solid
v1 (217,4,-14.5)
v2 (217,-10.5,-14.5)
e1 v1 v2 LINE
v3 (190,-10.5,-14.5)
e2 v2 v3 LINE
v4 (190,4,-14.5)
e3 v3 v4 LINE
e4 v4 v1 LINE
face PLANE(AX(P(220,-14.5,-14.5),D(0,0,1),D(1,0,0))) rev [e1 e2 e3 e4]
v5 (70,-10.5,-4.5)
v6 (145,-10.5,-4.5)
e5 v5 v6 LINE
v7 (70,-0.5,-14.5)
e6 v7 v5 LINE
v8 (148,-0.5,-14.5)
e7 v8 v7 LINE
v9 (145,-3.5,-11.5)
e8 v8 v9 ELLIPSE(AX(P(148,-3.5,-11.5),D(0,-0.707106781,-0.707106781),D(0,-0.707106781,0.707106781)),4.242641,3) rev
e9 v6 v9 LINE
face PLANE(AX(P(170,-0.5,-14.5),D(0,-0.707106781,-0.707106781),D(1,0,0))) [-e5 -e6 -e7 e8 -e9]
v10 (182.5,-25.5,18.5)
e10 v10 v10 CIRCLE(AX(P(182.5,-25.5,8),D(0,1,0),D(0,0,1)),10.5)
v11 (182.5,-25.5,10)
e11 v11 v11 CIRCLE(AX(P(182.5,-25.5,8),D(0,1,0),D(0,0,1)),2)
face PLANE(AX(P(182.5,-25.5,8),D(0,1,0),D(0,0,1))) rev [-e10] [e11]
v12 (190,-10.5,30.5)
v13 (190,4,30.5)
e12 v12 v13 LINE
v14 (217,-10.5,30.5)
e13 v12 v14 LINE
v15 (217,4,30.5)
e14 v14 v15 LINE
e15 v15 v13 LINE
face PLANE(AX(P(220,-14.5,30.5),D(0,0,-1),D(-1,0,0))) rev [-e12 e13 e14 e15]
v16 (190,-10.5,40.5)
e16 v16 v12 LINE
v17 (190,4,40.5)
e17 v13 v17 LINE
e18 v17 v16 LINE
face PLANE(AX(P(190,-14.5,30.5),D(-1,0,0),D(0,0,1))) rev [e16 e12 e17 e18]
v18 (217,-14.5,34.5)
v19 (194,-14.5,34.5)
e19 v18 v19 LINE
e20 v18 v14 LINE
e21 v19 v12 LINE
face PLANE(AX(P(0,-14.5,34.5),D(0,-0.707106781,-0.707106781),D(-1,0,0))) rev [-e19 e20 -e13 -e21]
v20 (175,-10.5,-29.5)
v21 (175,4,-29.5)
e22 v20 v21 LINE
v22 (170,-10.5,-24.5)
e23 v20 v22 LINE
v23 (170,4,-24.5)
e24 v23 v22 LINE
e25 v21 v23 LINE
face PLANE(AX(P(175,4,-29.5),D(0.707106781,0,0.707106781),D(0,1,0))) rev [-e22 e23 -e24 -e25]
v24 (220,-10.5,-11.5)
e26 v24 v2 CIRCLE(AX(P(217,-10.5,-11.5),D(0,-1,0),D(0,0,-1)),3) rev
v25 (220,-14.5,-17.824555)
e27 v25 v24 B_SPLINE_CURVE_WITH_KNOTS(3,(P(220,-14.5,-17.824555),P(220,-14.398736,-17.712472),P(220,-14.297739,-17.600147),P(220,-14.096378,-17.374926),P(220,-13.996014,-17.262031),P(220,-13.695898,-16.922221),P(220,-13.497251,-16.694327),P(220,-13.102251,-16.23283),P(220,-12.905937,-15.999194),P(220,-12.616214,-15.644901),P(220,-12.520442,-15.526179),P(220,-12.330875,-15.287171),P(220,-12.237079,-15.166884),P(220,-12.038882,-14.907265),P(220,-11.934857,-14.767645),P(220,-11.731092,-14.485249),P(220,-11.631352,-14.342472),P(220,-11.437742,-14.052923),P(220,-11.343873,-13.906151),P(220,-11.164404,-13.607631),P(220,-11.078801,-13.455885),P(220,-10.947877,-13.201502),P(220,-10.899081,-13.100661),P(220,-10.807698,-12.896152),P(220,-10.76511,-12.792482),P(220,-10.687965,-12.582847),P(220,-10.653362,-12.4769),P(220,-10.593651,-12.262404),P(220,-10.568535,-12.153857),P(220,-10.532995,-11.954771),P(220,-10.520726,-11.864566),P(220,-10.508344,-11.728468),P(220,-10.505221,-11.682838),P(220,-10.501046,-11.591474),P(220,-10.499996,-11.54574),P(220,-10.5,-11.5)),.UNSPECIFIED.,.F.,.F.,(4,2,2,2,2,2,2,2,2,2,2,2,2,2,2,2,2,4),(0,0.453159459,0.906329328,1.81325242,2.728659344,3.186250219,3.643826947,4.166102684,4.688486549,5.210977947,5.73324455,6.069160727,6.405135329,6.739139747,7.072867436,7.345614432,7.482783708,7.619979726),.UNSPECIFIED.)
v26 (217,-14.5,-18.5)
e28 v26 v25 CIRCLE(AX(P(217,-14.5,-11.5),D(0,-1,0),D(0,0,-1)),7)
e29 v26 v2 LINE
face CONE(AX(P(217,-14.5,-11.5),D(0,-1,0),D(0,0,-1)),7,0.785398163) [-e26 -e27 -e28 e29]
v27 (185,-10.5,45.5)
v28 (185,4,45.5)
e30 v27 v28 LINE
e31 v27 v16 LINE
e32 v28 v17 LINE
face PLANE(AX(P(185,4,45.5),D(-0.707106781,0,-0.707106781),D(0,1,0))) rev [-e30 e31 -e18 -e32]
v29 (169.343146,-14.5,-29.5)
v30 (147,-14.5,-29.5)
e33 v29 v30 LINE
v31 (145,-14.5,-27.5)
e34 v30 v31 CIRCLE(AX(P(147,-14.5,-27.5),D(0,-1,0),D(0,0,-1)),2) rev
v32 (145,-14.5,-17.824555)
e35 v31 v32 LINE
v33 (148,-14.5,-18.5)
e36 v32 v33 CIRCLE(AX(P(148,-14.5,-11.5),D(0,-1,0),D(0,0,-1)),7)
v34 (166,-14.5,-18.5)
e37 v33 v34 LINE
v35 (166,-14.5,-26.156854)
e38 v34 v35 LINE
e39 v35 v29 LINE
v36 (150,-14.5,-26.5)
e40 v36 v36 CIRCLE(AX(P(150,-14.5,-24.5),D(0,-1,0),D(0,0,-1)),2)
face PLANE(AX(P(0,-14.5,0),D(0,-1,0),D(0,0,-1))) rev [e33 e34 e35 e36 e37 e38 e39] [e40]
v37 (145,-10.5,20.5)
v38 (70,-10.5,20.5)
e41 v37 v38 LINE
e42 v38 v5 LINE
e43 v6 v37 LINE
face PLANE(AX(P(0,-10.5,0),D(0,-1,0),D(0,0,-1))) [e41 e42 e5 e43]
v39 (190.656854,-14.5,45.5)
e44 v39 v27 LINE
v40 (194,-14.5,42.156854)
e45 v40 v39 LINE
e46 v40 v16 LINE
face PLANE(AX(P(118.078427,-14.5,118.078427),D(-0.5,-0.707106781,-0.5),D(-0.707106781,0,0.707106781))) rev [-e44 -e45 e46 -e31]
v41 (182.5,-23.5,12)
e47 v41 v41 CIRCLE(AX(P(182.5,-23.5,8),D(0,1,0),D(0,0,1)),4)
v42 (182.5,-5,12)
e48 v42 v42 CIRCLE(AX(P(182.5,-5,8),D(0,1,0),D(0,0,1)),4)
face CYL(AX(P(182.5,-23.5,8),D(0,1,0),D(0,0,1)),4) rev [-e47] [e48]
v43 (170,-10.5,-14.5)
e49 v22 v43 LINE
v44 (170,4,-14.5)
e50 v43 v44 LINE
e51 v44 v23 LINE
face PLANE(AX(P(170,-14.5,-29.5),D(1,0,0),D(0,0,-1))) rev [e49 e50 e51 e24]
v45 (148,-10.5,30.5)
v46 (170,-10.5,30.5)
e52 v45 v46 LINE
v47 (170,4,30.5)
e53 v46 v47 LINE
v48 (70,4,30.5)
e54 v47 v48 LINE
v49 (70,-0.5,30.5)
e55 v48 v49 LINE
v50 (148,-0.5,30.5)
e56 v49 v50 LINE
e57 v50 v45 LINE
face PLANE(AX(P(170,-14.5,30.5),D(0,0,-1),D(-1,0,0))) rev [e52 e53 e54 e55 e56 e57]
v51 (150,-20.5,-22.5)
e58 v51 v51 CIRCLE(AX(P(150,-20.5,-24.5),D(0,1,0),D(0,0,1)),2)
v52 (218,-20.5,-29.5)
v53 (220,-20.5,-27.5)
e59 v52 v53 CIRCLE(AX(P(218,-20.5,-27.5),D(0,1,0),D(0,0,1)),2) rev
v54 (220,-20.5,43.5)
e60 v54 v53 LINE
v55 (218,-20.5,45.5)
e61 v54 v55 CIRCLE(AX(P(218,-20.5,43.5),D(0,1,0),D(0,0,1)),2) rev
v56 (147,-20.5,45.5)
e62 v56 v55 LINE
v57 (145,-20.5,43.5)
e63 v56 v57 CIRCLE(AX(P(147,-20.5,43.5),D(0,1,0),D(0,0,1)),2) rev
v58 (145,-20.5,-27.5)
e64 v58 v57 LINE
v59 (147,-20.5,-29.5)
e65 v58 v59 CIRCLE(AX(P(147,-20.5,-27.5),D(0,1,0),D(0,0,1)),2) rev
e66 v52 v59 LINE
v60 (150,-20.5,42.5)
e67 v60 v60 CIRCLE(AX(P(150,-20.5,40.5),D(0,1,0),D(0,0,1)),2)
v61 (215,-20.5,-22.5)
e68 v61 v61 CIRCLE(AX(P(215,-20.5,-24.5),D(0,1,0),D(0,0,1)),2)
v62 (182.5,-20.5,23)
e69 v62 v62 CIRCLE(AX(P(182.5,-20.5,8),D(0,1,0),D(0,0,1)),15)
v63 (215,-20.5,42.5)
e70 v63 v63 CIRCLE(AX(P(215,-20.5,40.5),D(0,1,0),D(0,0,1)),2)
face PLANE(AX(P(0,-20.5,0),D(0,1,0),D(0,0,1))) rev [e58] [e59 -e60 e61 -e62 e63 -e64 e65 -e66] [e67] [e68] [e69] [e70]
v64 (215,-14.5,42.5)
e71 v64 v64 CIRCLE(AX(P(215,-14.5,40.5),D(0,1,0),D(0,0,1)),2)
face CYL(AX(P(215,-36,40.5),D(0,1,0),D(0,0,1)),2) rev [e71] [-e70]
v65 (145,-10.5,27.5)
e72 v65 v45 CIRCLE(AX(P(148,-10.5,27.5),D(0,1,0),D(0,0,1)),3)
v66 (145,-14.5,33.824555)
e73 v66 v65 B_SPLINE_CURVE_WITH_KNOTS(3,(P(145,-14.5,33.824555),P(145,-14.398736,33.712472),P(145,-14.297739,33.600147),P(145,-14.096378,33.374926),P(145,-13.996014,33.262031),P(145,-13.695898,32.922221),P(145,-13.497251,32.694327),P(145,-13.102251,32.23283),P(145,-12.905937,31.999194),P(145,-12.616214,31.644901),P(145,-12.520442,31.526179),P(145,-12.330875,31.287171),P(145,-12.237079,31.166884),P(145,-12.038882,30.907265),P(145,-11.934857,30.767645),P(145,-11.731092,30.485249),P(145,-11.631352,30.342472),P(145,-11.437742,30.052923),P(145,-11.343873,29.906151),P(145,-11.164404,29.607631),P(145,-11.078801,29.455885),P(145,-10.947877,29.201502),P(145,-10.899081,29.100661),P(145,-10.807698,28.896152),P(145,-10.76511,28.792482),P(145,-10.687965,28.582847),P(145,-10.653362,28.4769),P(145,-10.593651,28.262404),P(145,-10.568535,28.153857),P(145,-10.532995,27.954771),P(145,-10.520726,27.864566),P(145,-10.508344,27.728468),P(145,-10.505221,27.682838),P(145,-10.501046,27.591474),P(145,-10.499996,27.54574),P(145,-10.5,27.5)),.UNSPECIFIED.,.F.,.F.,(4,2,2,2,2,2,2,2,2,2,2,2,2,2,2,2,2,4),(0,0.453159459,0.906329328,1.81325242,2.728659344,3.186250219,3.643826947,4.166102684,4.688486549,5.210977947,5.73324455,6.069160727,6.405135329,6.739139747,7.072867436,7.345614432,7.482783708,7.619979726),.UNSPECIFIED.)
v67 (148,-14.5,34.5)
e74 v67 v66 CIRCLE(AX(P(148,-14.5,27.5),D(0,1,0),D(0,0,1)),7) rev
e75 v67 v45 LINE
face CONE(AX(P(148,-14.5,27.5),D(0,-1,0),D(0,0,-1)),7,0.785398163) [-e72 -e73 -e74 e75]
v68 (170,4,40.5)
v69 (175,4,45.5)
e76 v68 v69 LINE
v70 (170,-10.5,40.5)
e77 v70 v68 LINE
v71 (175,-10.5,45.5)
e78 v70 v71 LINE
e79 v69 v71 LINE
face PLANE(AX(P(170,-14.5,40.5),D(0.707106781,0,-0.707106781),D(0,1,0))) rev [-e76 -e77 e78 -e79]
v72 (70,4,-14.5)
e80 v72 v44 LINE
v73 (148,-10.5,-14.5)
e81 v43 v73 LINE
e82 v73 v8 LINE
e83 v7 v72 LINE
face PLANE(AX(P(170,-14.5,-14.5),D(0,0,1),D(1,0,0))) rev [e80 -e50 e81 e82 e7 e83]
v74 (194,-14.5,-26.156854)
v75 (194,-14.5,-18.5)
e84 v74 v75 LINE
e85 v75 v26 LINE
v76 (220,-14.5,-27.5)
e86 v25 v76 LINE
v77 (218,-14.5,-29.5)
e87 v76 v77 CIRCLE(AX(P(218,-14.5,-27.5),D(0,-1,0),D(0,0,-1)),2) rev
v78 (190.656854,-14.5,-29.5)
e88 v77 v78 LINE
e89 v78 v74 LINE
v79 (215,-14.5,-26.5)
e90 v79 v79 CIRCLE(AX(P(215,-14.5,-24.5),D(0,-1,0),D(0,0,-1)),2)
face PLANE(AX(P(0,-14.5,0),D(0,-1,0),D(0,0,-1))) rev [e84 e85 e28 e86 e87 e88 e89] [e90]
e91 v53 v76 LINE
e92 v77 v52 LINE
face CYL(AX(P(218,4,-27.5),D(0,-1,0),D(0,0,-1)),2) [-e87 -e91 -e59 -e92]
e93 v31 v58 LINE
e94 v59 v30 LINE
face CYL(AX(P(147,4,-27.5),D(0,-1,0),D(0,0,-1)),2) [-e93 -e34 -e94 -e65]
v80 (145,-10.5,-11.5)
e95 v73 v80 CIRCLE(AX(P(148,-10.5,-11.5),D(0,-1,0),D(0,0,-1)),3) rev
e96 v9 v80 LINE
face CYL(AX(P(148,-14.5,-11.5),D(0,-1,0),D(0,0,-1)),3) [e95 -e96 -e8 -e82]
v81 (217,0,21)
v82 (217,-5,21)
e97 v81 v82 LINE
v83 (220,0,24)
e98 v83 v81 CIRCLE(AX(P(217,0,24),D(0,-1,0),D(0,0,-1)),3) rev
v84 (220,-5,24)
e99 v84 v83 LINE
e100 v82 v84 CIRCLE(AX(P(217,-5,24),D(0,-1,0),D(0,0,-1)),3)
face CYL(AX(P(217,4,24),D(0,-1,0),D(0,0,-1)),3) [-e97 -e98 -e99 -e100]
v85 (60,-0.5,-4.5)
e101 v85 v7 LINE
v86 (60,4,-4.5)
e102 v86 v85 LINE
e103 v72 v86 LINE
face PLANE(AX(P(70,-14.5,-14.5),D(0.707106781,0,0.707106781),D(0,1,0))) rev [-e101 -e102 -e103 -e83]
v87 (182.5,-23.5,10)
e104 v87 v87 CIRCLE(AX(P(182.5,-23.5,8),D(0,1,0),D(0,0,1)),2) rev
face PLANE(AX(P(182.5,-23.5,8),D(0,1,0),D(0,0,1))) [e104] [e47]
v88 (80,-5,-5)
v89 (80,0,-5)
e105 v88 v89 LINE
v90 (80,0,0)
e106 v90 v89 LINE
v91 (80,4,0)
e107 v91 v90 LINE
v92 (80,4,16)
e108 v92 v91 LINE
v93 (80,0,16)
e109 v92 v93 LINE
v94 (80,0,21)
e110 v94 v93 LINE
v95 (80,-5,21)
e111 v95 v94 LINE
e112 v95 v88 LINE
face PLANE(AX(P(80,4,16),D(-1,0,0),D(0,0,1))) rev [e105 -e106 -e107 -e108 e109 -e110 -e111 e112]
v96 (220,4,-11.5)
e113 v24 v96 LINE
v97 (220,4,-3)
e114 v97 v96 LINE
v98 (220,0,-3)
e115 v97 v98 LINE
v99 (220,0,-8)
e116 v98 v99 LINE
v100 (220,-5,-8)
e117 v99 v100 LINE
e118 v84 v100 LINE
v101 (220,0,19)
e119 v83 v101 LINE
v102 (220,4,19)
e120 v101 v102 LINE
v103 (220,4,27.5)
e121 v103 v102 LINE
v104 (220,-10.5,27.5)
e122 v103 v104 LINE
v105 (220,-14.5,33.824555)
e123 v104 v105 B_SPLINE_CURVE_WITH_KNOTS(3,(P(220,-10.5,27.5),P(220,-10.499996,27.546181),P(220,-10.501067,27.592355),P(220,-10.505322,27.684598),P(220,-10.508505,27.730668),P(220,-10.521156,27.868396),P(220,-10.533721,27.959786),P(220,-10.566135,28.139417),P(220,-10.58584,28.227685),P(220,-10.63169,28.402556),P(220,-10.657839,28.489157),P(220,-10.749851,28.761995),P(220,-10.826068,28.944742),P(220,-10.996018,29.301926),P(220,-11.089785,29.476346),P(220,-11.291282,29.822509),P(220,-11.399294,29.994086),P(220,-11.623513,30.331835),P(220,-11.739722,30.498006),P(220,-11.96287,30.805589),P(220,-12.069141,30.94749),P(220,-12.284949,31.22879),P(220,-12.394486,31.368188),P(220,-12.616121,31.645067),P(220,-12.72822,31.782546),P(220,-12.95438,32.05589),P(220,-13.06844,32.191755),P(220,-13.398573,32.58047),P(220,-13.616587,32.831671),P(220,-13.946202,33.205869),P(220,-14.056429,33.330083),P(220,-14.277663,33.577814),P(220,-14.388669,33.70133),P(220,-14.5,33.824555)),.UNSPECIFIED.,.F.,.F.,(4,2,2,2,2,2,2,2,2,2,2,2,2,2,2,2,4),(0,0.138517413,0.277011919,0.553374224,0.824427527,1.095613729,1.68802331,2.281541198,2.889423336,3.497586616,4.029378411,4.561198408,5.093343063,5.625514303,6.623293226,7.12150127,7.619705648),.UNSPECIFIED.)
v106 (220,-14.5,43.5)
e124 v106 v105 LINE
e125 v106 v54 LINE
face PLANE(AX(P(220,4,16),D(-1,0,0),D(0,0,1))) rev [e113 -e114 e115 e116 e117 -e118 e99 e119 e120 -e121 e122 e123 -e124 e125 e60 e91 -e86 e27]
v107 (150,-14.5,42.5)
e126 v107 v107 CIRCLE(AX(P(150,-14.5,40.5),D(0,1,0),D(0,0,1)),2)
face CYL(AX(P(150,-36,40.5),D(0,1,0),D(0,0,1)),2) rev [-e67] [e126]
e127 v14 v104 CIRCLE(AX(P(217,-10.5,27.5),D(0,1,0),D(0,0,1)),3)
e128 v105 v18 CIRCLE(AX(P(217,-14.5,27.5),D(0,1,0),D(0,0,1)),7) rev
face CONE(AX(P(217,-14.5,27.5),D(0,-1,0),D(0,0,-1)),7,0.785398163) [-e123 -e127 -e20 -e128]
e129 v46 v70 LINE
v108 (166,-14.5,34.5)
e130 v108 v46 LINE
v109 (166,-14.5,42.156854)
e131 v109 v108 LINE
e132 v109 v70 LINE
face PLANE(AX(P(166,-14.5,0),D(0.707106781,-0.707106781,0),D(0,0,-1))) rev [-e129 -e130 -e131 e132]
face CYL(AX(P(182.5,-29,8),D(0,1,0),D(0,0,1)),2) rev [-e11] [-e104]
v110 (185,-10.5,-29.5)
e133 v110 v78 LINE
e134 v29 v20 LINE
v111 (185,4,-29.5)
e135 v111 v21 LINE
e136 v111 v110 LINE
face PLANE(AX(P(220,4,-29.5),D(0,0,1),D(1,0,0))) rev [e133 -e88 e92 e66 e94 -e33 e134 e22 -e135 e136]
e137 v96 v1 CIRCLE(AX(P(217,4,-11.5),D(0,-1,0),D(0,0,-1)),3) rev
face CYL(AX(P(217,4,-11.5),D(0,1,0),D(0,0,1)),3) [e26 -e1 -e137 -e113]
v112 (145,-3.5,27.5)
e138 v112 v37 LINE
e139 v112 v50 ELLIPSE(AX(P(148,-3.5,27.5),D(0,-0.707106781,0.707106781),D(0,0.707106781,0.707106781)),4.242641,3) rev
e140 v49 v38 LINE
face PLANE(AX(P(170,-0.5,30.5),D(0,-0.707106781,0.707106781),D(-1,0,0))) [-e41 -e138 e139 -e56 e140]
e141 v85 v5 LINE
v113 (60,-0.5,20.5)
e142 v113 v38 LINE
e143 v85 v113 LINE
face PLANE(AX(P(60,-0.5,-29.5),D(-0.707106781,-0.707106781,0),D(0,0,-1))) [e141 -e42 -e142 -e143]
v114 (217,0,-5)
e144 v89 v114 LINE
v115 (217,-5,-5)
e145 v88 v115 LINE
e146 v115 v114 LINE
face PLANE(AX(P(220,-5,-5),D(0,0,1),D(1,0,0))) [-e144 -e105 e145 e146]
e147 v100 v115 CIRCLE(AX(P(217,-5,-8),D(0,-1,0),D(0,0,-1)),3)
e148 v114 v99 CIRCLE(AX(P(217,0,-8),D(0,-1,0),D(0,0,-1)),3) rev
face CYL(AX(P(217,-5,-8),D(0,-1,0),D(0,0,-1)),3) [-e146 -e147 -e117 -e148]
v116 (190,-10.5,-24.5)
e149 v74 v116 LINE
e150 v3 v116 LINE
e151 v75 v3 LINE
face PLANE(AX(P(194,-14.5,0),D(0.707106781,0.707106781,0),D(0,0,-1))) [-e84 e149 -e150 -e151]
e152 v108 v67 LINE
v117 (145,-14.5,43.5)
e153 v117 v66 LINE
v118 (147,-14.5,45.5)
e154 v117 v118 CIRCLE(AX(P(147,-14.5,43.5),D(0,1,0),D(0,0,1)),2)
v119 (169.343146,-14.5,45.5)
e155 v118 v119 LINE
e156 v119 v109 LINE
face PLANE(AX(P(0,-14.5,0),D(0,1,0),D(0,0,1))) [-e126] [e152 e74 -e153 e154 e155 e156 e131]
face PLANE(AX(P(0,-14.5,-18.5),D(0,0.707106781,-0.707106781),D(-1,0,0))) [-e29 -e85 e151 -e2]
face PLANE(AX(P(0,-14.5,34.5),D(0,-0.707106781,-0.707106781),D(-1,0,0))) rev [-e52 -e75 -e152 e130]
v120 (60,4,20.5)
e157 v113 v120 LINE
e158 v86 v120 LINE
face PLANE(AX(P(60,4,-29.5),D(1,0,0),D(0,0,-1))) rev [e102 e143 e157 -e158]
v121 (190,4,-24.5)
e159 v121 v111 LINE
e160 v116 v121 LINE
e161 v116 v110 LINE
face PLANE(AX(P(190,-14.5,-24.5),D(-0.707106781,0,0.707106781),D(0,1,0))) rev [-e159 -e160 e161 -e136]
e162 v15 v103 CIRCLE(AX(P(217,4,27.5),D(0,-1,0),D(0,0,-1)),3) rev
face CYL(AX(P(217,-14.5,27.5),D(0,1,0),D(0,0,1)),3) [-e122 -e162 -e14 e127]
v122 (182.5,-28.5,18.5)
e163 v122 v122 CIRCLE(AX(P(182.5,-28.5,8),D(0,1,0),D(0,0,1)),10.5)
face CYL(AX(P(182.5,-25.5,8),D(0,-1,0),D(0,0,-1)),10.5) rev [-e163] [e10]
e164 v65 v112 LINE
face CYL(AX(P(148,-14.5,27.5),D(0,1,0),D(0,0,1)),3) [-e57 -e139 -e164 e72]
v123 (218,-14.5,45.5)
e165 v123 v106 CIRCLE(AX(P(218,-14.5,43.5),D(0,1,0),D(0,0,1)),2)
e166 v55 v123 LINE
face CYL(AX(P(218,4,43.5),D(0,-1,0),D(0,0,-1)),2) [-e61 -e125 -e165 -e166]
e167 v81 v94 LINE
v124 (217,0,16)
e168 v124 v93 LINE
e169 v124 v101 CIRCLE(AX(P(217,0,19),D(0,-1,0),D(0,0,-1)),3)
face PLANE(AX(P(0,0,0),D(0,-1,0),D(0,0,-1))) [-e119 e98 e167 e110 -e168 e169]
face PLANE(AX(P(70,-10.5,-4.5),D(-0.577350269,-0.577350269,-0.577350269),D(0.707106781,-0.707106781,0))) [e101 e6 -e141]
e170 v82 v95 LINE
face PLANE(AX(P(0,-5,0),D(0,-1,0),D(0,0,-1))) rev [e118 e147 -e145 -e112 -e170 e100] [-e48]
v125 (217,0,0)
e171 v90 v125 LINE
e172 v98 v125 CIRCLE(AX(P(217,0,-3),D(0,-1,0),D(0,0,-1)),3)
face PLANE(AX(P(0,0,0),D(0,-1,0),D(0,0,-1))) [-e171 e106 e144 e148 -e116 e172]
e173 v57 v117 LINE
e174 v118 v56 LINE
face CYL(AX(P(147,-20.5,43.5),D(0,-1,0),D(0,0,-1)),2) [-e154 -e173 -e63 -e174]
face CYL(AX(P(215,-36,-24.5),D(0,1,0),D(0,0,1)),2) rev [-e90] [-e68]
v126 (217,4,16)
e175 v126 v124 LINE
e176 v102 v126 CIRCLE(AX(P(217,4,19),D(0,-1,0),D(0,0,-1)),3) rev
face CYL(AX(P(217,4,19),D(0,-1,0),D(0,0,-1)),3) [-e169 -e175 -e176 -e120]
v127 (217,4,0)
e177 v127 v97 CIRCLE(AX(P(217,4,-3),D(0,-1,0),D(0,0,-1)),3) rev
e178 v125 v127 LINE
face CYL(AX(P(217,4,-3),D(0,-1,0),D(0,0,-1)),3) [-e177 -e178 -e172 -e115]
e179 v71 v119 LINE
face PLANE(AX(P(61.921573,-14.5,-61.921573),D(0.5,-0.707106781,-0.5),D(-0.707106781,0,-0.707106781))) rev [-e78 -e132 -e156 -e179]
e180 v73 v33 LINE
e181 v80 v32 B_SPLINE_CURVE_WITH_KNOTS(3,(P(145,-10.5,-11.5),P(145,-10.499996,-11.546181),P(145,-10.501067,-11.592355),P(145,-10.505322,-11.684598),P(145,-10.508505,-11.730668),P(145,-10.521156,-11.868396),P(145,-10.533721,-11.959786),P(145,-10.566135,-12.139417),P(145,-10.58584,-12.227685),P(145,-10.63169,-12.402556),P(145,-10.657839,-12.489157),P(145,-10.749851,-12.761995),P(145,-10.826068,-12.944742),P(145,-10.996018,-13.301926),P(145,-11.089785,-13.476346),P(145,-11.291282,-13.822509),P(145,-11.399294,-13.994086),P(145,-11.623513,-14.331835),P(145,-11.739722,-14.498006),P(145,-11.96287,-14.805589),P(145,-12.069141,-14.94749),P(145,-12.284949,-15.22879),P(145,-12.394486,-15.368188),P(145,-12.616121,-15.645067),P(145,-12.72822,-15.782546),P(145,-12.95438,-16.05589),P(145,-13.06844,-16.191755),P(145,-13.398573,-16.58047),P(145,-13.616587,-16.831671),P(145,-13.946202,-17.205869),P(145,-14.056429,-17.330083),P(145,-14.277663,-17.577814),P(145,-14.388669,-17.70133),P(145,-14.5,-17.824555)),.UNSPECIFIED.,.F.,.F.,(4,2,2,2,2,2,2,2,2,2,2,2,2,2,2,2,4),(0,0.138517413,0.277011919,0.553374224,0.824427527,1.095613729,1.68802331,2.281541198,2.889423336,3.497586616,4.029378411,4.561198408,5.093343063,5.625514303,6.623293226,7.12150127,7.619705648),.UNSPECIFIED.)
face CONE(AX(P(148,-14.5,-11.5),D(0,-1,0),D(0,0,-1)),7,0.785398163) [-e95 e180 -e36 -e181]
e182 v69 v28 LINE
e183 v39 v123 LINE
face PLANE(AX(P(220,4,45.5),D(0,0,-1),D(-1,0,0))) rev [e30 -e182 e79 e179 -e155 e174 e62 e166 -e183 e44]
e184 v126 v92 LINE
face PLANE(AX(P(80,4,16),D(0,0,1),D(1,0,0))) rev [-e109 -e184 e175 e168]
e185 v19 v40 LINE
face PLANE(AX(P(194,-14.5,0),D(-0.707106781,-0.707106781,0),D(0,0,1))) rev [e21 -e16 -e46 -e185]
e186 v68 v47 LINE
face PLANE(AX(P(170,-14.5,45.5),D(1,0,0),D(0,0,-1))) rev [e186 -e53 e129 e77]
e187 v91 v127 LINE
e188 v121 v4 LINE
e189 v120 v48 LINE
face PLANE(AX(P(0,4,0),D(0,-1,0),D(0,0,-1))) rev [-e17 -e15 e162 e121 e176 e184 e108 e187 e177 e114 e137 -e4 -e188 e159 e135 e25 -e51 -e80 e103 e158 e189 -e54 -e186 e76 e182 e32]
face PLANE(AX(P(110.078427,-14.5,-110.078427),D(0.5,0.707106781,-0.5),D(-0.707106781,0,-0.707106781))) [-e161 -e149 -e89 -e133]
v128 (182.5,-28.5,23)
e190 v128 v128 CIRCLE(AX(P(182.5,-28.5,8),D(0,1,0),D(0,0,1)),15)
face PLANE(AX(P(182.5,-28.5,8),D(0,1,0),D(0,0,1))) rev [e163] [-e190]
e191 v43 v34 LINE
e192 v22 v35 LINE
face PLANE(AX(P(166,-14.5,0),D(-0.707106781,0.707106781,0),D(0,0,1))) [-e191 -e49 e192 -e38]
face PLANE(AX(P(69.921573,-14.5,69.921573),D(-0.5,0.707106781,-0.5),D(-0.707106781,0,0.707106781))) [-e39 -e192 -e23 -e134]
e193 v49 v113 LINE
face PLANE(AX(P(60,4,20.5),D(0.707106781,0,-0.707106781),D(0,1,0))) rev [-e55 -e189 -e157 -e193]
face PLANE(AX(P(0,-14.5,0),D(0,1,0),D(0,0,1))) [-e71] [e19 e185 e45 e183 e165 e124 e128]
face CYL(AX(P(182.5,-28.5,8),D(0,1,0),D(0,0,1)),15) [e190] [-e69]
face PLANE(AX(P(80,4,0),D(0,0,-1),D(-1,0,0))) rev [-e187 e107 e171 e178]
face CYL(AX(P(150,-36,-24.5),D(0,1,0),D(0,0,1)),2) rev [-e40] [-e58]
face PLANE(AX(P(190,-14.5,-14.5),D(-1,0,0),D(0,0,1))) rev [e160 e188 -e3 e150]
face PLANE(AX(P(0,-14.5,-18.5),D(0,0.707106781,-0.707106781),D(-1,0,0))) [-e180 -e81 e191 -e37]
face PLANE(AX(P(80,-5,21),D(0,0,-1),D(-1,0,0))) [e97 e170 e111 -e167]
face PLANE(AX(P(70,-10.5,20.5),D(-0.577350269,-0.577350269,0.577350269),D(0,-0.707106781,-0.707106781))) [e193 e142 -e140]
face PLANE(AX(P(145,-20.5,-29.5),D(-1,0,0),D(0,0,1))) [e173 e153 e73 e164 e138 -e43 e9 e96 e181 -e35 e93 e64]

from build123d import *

# Parameters (mm, degrees)
BOSS_EXTRUDE1_DEPTH = 4
BOSS_EXTRUDE2_DEPTH = 5
BOSS_EXTRUDE3_START = -5
SKETCH3_W           = 160
SKETCH3_H           = 75
BOSS_EXTRUDE3_DEPTH = 5.5
BOSS_EXTRUDE4_START = -10.5
BOSS_EXTRUDE4_DEPTH = 10
BOSS_EXTRUDE7_START = -20.5
SKETCH17_R          = 15
BOSS_EXTRUDE7_DEPTH = 8
CUT_EXTRUDE1_START  = -28.5
SKETCH5_R           = 10.5
CUT_EXTRUDE1_DEPTH  = 3
CUT_EXTRUDE2_START  = -4
SKETCH7_R           = 2
CUT_EXTRUDE2_DEPTH  = 25
CUT_EXTRUDE3_START  = -5
SKETCH8_R           = 4
CUT_EXTRUDE3_DEPTH  = 18.5
CUT_EXTRUDE5_START  = 4
SKETCH18_W          = 110
SKETCH18_H          = 15
SKETCH18_W_2        = 30
CUT_EXTRUDE5_DEPTH  = 18.5
CUT_EXTRUDE6_START  = -4
SKETCH9_R           = 2
CUT_EXTRUDE6_DEPTH  = 40
CHAMFER1_SIZE       = 10
FILLET1_R           = 2
CHAMFER2_SIZE       = 5
FILLET6_R           = 3
CHAMFER4_SIZE       = 4


with BuildPart() as part:
    # Sketch1 → Boss-Extrude1 (new body)
    with BuildSketch(Plane(origin=(0, 0, 0), x_dir=(1, 0, 0), z_dir=(0, 1, 0))):
        Polygon((80, -16), (220, -16), (220, -45.5), (60, -45.5), (60, 29.5), (220, 29.5), (220, 0), (80, 0), align=None)
    extrude(amount=BOSS_EXTRUDE1_DEPTH)

    # Sketch2 → Boss-Extrude2 (add)
    with BuildSketch(Plane(origin=(0, 0, 0), x_dir=(1, 0, 0), z_dir=(0, 1, 0))):
        Polygon((220, 5), (220, 29.5), (60, 29.5), (60, -45.5), (220, -45.5), (220, -21), (80, -21), (80, 5), align=None)
    extrude(amount=-BOSS_EXTRUDE2_DEPTH)

    # Sketch3 → Boss-Extrude3 (add)
    with BuildSketch(Plane(origin=(0, 0, 0), x_dir=(1, 0, 0), z_dir=(0, 1, 0)).offset(BOSS_EXTRUDE3_START)):
        with Locations((140, -8)):
            Rectangle(SKETCH3_W, SKETCH3_H)
    extrude(amount=-BOSS_EXTRUDE3_DEPTH)

    # Sketch4 → Boss-Extrude4 (add)
    with BuildSketch(Plane(origin=(0, 0, 0), x_dir=(1, 0, 0), z_dir=(0, 1, 0)).offset(BOSS_EXTRUDE4_START)):
        Polygon((145, -8), (145, -45.5), (220, -45.5), (220, 29.5), (145, 29.5), align=None)
    extrude(amount=-BOSS_EXTRUDE4_DEPTH)

    # Sketch17 → Boss-Extrude7 (add)
    with BuildSketch(Plane(origin=(0, 0, 0), x_dir=(1, 0, 0), z_dir=(0, 1, 0)).offset(BOSS_EXTRUDE7_START)):
        with Locations(Location((182.5, -8, 0), (0, 0, 270))):
            Circle(SKETCH17_R)
    extrude(amount=-BOSS_EXTRUDE7_DEPTH)

    # Sketch5 → Cut-Extrude1 (cut)
    with BuildSketch(Plane(origin=(0, 0, 0), x_dir=(1, 0, 0), z_dir=(0, 1, 0)).offset(CUT_EXTRUDE1_START)):
        with Locations(Location((182.5, -8, 0), (0, 0, 270))):
            Circle(SKETCH5_R)
    extrude(amount=CUT_EXTRUDE1_DEPTH, mode=Mode.SUBTRACT)

    # Sketch7 → Cut-Extrude2 (cut)
    with BuildSketch(Plane(origin=(0, 0, 0), x_dir=(1, 0, 0), z_dir=(0, 1, 0)).offset(CUT_EXTRUDE2_START)):
        with Locations(Location((182.5, -8, 0), (0, 0, 270))):
            Circle(SKETCH7_R)
    extrude(amount=-CUT_EXTRUDE2_DEPTH, mode=Mode.SUBTRACT)

    # Sketch8 → Cut-Extrude3 (cut)
    with BuildSketch(Plane(origin=(0, 0, 0), x_dir=(1, 0, 0), z_dir=(0, 1, 0)).offset(CUT_EXTRUDE3_START)):
        with Locations(Location((182.5, -8, 0), (0, 0, 270))):
            Circle(SKETCH8_R)
    extrude(amount=-CUT_EXTRUDE3_DEPTH, mode=Mode.SUBTRACT)

    # Sketch18 → Cut-Extrude5 (cut)
    with BuildSketch(Plane(origin=(0, 0, 0), x_dir=(1, 0, 0), z_dir=(0, 1, 0)).offset(CUT_EXTRUDE5_START)):
        with Locations((115, 22)):
            Rectangle(SKETCH18_W, SKETCH18_H)
        with Locations((115, -38)):
            Rectangle(SKETCH18_W, SKETCH18_H)
        with Locations((205, 22)):
            Rectangle(SKETCH18_W_2, SKETCH18_H)
        with Locations((205, -38)):
            Rectangle(SKETCH18_W_2, SKETCH18_H)
    extrude(amount=-CUT_EXTRUDE5_DEPTH, mode=Mode.SUBTRACT)

    # Sketch9 → Cut-Extrude6 (cut)
    with BuildSketch(Plane(origin=(0, 0, 0), x_dir=(1, 0, 0), z_dir=(0, 1, 0)).offset(CUT_EXTRUDE6_START)):
        with Locations(Location((150, -40.5, 0), (0, 0, 270))):
            Circle(SKETCH9_R)
        with Locations(Location((150, 24.5, 0), (0, 0, 270))):
            Circle(SKETCH9_R)
        with Locations(Location((215, 24.5, 0), (0, 0, 270))):
            Circle(SKETCH9_R)
        with Locations(Location((215, -40.5, 0), (0, 0, 270))):
            Circle(SKETCH9_R)
    extrude(amount=-CUT_EXTRUDE6_DEPTH, mode=Mode.SUBTRACT)

    # Chamfer1
    chamfer1_edges = [part.edges().sort_by_distance(p)[0] for p in [
        (60, -10.5, 8),
        (102.5, -10.5, 30.5),
        (60, -3.25, 30.5),
        (102.5, -10.5, -14.5),
        (60, -3.25, -14.5),
    ]]
    chamfer(chamfer1_edges, length=CHAMFER1_SIZE)

    # Fillet1
    fillet1_edges = [part.edges().sort_by_distance(p)[0] for p in [
        (220, -17.5, 45.5),
        (220, -17.5, -29.5),
        (145, -17.5, 45.5),
        (145, -17.5, -29.5),
    ]]
    fillet(fillet1_edges, radius=FILLET1_R)

    # Chamfer2
    chamfer2_edges = [part.edges().sort_by_distance(p)[0] for p in [
        (170, -5.25, 45.5),
        (190, -5.25, -29.5),
        (190, -5.25, 45.5),
        (170, -5.25, -29.5),
    ]]
    chamfer(chamfer2_edges, length=CHAMFER2_SIZE)

    # Fillet6
    fillet6_edges = [part.edges().sort_by_distance(p)[0] for p in [
        (220, -5.25, -14.5),
        (220, -5.25, 30.5),
        (220, 2, 16),
        (220, 2, 0),
        (220, -2.5, -5),
        (220, -2.5, 21),
        (145, -7.5, -14.5),
        (145, -7.5, 30.5),
    ]]
    fillet(fillet6_edges, radius=FILLET6_R)

    # Chamfer4
    # the kernel refuses this chamfer: 4 mm, written as the material it adds along each edge
    with BuildSketch(Plane(origin=(180.286731952, -14.5, 30.5), x_dir=(0, 1, 0), z_dir=(-1, 0, 0)), Plane(origin=(180.286731952, -14.5, -14.5), x_dir=(0, 0, -1), z_dir=(-1, 0, 0))) as chamfer4_piece_1:
        Polygon((CHAMFER4_SIZE, 0), (0, -CHAMFER4_SIZE), (0, 0), align=None)
    extrude(amount=32.286731952)
    with BuildSketch(Plane(origin=(217, -14.5, -14.5), x_dir=(0, 0, -1), z_dir=(-1, 0, 0)), Plane(origin=(217, -14.5, 30.5), x_dir=(0, 1, 0), z_dir=(-1, 0, 0))) as chamfer4_piece_2:
        Polygon((CHAMFER4_SIZE, 0), (0, -CHAMFER4_SIZE), (0, 0), align=None)
    extrude(amount=37.286731952)
    with BuildSketch(Plane(origin=(190, -14.5, 20.213268048), x_dir=(1, 0, 0), z_dir=(0, 0, 1))) as chamfer4_piece_3_section:
        Polygon((CHAMFER4_SIZE, 0), (0, CHAMFER4_SIZE), (0, 0), align=None)
    chamfer4_piece_3 = extrude(amount=30.573463904, mode=Mode.PRIVATE)
    chamfer4_piece_3 = split(chamfer4_piece_3, bisect_by=Plane(origin=(200.143365976, -14.5, 30.356634024), z_dir=(-0.7071067811865476, 0, -0.7071067811865476)), keep=Keep.TOP, mode=Mode.PRIVATE)
    add(chamfer4_piece_3)
    with BuildSketch(Plane(origin=(170, -14.5, -34.786731952), x_dir=(-1, 0, 0), z_dir=(0, 0, 1))) as chamfer4_piece_4_section:
        Polygon((CHAMFER4_SIZE, 0), (0, -CHAMFER4_SIZE), (0, 0), align=None)
    chamfer4_piece_4 = extrude(amount=30.573463904, mode=Mode.PRIVATE)
    chamfer4_piece_4 = split(chamfer4_piece_4, bisect_by=Plane(origin=(175.143365976, -14.5, -29.643365976), z_dir=(0.7071067811865476, 0, 0.7071067811865476)), keep=Keep.TOP, mode=Mode.PRIVATE)
    add(chamfer4_piece_4)
    with BuildSketch(Plane(origin=(170, -14.5, 50.786731952), x_dir=(0, 1, 0), z_dir=(0, 0, -1))) as chamfer4_piece_5_section:
        Polygon((CHAMFER4_SIZE, 0), (0, -CHAMFER4_SIZE), (0, 0), align=None)
    chamfer4_piece_5 = extrude(amount=30.573463904, mode=Mode.PRIVATE)
    chamfer4_piece_5 = split(chamfer4_piece_5, bisect_by=Plane(origin=(175.143365976, -14.5, 45.643365976), z_dir=(0.7071067811865476, 0, -0.7071067811865476)), keep=Keep.TOP, mode=Mode.PRIVATE)
    add(chamfer4_piece_5)
    with BuildSketch(Plane(origin=(190, -14.5, -4.213268048), x_dir=(1, 0, 0), z_dir=(0, 0, -1))) as chamfer4_piece_6_section:
        Polygon((CHAMFER4_SIZE, 0), (0, -CHAMFER4_SIZE), (0, 0), align=None)
    chamfer4_piece_6 = extrude(amount=30.573463904, mode=Mode.PRIVATE)
    chamfer4_piece_6 = split(chamfer4_piece_6, bisect_by=Plane(origin=(200.143365976, -14.5, -14.356634024), z_dir=(-0.7071067811865476, 0, 0.7071067811865476)), keep=Keep.TOP, mode=Mode.PRIVATE)
    add(chamfer4_piece_6)
    with BuildSketch(Plane(origin=(177.726182081, -14.5, 52.773817919), x_dir=(0.7071067811865476, 0, 0.7071067811865476), z_dir=(0.7071067811865476, 0, -0.7071067811865476))) as chamfer4_piece_7_section:
        Polygon((CHAMFER4_SIZE, 0), (0, -CHAMFER4_SIZE), (0, 0), align=None)
    chamfer4_piece_7 = extrude(amount=27.644531716, mode=Mode.PRIVATE)
    chamfer4_piece_7 = split(chamfer4_piece_7, bisect_by=Plane(origin=(177.726182081, -14.5, 45.5), z_dir=(0, 0, -1)), keep=Keep.TOP, mode=Mode.PRIVATE)
    chamfer4_piece_7 = split(chamfer4_piece_7, bisect_by=Plane(origin=(190, -14.5, 52.773817919), z_dir=(-1, 0, 0)), keep=Keep.TOP, mode=Mode.PRIVATE)
    add(chamfer4_piece_7)
    with BuildSketch(Plane(origin=(182.273817919, -14.5, 52.773817919), x_dir=(0, 1, 0), z_dir=(-0.7071067811865476, 0, -0.7071067811865476))) as chamfer4_piece_8_section:
        Polygon((CHAMFER4_SIZE, 0), (0, -CHAMFER4_SIZE), (0, 0), align=None)
    chamfer4_piece_8 = extrude(amount=27.644531716, mode=Mode.PRIVATE)
    chamfer4_piece_8 = split(chamfer4_piece_8, bisect_by=Plane(origin=(170, -14.5, 52.773817919), z_dir=(1, 0, 0)), keep=Keep.TOP, mode=Mode.PRIVATE)
    chamfer4_piece_8 = split(chamfer4_piece_8, bisect_by=Plane(origin=(182.273817919, -14.5, 45.5), z_dir=(0, 0, -1)), keep=Keep.TOP, mode=Mode.PRIVATE)
    add(chamfer4_piece_8)
    with BuildSketch(Plane(origin=(182.273817919, -14.5, -36.773817919), x_dir=(-0.7071067811865476, 0, -0.7071067811865476), z_dir=(-0.7071067811865476, 0, 0.7071067811865476))) as chamfer4_piece_9_section:
        Polygon((CHAMFER4_SIZE, 0), (0, -CHAMFER4_SIZE), (0, 0), align=None)
    chamfer4_piece_9 = extrude(amount=27.644531716, mode=Mode.PRIVATE)
    chamfer4_piece_9 = split(chamfer4_piece_9, bisect_by=Plane(origin=(170, -14.5, -36.773817919), z_dir=(1, 0, 0)), keep=Keep.TOP, mode=Mode.PRIVATE)
    chamfer4_piece_9 = split(chamfer4_piece_9, bisect_by=Plane(origin=(182.273817919, -14.5, -29.5), z_dir=(0, 0, 1)), keep=Keep.TOP, mode=Mode.PRIVATE)
    add(chamfer4_piece_9)
    with BuildSketch(Plane(origin=(177.726182081, -14.5, -36.773817919), x_dir=(0.7071067811865476, 0, -0.7071067811865476), z_dir=(0.7071067811865476, 0, 0.7071067811865476))) as chamfer4_piece_10_section:
        Polygon((CHAMFER4_SIZE, 0), (0, CHAMFER4_SIZE), (0, 0), align=None)
    chamfer4_piece_10 = extrude(amount=27.644531716, mode=Mode.PRIVATE)
    chamfer4_piece_10 = split(chamfer4_piece_10, bisect_by=Plane(origin=(190, -14.5, -36.773817919), z_dir=(-1, 0, 0)), keep=Keep.TOP, mode=Mode.PRIVATE)
    chamfer4_piece_10 = split(chamfer4_piece_10, bisect_by=Plane(origin=(177.726182081, -14.5, -29.5), z_dir=(0, 0, 1)), keep=Keep.TOP, mode=Mode.PRIVATE)
    add(chamfer4_piece_10)
    with BuildSketch(Plane(origin=(148, -14.5, -11.5), x_dir=(0, 0, -1), z_dir=(1, 0, 0))) as chamfer4_piece_11_section:
        Polygon((3 + CHAMFER4_SIZE, 0), (3, CHAMFER4_SIZE), (3, 0), align=None)
    chamfer4_piece_11 = revolve(axis=Axis((148, -14.5, -11.5), (0, 1, 0)), revolution_arc=286.541029039, mode=Mode.PRIVATE)
    chamfer4_piece_11 = split(chamfer4_piece_11, bisect_by=Plane(origin=(145, -14.5, -11.5), z_dir=(1, 0, 0)), keep=Keep.TOP, mode=Mode.PRIVATE)
    add(chamfer4_piece_11)
    with BuildSketch(Plane(origin=(148, -14.5, 27.5), x_dir=(0, 0, 1), z_dir=(1, 0, 0))) as chamfer4_piece_12_section:
        Polygon((3, -CHAMFER4_SIZE), (3 + CHAMFER4_SIZE, 0), (3, 0), align=None)
    chamfer4_piece_12 = revolve(axis=Axis((148, -14.5, 27.5), (0, -1, 0)), revolution_arc=286.541029039, mode=Mode.PRIVATE)
    chamfer4_piece_12 = split(chamfer4_piece_12, bisect_by=Plane(origin=(145, -14.5, 27.5), z_dir=(1, 0, 0)), keep=Keep.TOP, mode=Mode.PRIVATE)
    add(chamfer4_piece_12)
    with BuildSketch(Plane(origin=(217, -14.5, 27.5), x_dir=(0, 0, 1), z_dir=(-1, 0, 0))) as chamfer4_piece_13_section:
        Polygon((3 + CHAMFER4_SIZE, 0), (3, CHAMFER4_SIZE), (3, 0), align=None)
    chamfer4_piece_13 = revolve(axis=Axis((217, -14.5, 27.5), (0, 1, 0)), revolution_arc=286.541029039, mode=Mode.PRIVATE)
    chamfer4_piece_13 = split(chamfer4_piece_13, bisect_by=Plane(origin=(220, -14.5, 27.5), z_dir=(-1, 0, 0)), keep=Keep.TOP, mode=Mode.PRIVATE)
    add(chamfer4_piece_13)
    with BuildSketch(Plane(origin=(217, -14.5, -11.5), x_dir=(-0.9586161079841448, 0, -0.28470187479770964), z_dir=(0.28470187479770964, 0, -0.9586161079841448))) as chamfer4_piece_14_section:
        Polygon((3 + CHAMFER4_SIZE, 0), (3, CHAMFER4_SIZE), (3, 0), align=None)
    chamfer4_piece_14 = revolve(axis=Axis((217, -14.5, -11.5), (0, 1, 0)), revolution_arc=286.541029039, mode=Mode.PRIVATE)
    chamfer4_piece_14 = split(chamfer4_piece_14, bisect_by=Plane(origin=(220, -14.5, -11.5), z_dir=(-1, 0, 0)), keep=Keep.TOP, mode=Mode.PRIVATE)
    add(chamfer4_piece_14)
    with BuildSketch(Plane(origin=(190, -14.5, 30.5), x_dir=(1, 0, 0), z_dir=(0, 0, 1))) as chamfer4_piece_15a_section:
        Polygon((CHAMFER4_SIZE, 0), (0, CHAMFER4_SIZE), (0, 0), align=None)
    chamfer4_piece_15a = extrude(amount=20.286731952, mode=Mode.PRIVATE)
    chamfer4_piece_15a = split(chamfer4_piece_15a, bisect_by=Plane(origin=(190, -14.5, 45.5), z_dir=(0, 0, -1)), keep=Keep.TOP, mode=Mode.PRIVATE)
    chamfer4_piece_15a = split(chamfer4_piece_15a, bisect_by=Plane(origin=(195, -14.5, 35.5), z_dir=(0.7071067811865476, 0, 0.7071067811865476)), keep=Keep.TOP, mode=Mode.PRIVATE)
    with BuildSketch(Plane(origin=(177.726182081, -14.5, 52.773817919), x_dir=(0.7071067811865476, 0, 0.7071067811865476), z_dir=(0.7071067811865476, 0, -0.7071067811865476))) as chamfer4_piece_15b_section:
        Polygon((CHAMFER4_SIZE, 0), (0, -CHAMFER4_SIZE), (0, 0), align=None)
    chamfer4_piece_15b = extrude(amount=27.644531716, mode=Mode.PRIVATE)
    chamfer4_piece_15b = split(chamfer4_piece_15b, bisect_by=Plane(origin=(177.726182081, -14.5, 45.5), z_dir=(0, 0, -1)), keep=Keep.TOP, mode=Mode.PRIVATE)
    chamfer4_piece_15b = split(chamfer4_piece_15b, bisect_by=Plane(origin=(190, -14.5, 52.773817919), z_dir=(1, 0, 0)), keep=Keep.TOP, mode=Mode.PRIVATE)
    chamfer4_piece_15 = chamfer4_piece_15a & chamfer4_piece_15b
    add(chamfer4_piece_15)
    with BuildSketch(Plane(origin=(182.273817919, -14.5, -36.773817919), x_dir=(-0.7071067811865476, 0, -0.7071067811865476), z_dir=(-0.7071067811865476, 0, 0.7071067811865476))) as chamfer4_piece_16a_section:
        Polygon((CHAMFER4_SIZE, 0), (0, -CHAMFER4_SIZE), (0, 0), align=None)
    chamfer4_piece_16a = extrude(amount=27.644531716, mode=Mode.PRIVATE)
    chamfer4_piece_16a = split(chamfer4_piece_16a, bisect_by=Plane(origin=(170, -14.5, -36.773817919), z_dir=(-1, 0, 0)), keep=Keep.TOP, mode=Mode.PRIVATE)
    chamfer4_piece_16a = split(chamfer4_piece_16a, bisect_by=Plane(origin=(182.273817919, -14.5, -29.5), z_dir=(0, 0, 1)), keep=Keep.TOP, mode=Mode.PRIVATE)
    with BuildSketch(Plane(origin=(170, -14.5, -34.786731952), x_dir=(-1, 0, 0), z_dir=(0, 0, 1))) as chamfer4_piece_16b_section:
        Polygon((CHAMFER4_SIZE, 0), (0, -CHAMFER4_SIZE), (0, 0), align=None)
    chamfer4_piece_16b = extrude(amount=20.286731952, mode=Mode.PRIVATE)
    chamfer4_piece_16b = split(chamfer4_piece_16b, bisect_by=Plane(origin=(175.143365976, -14.5, -29.643365976), z_dir=(-0.7071067811865476, 0, -0.7071067811865476)), keep=Keep.TOP, mode=Mode.PRIVATE)
    chamfer4_piece_16b = split(chamfer4_piece_16b, bisect_by=Plane(origin=(170, -14.5, -29.5), z_dir=(0, 0, 1)), keep=Keep.TOP, mode=Mode.PRIVATE)
    chamfer4_piece_16 = chamfer4_piece_16a & chamfer4_piece_16b
    add(chamfer4_piece_16)
    with BuildSketch(Plane(origin=(170, -14.5, 50.786731952), x_dir=(0, 1, 0), z_dir=(0, 0, -1))) as chamfer4_piece_17a_section:
        Polygon((CHAMFER4_SIZE, 0), (0, -CHAMFER4_SIZE), (0, 0), align=None)
    chamfer4_piece_17a = extrude(amount=20.286731952, mode=Mode.PRIVATE)
    chamfer4_piece_17a = split(chamfer4_piece_17a, bisect_by=Plane(origin=(175.143365976, -14.5, 45.643365976), z_dir=(-0.7071067811865476, 0, 0.7071067811865476)), keep=Keep.TOP, mode=Mode.PRIVATE)
    chamfer4_piece_17a = split(chamfer4_piece_17a, bisect_by=Plane(origin=(170, -14.5, 45.5), z_dir=(0, 0, -1)), keep=Keep.TOP, mode=Mode.PRIVATE)
    with BuildSketch(Plane(origin=(182.273817919, -14.5, 52.773817919), x_dir=(0, 1, 0), z_dir=(-0.7071067811865476, 0, -0.7071067811865476))) as chamfer4_piece_17b_section:
        Polygon((CHAMFER4_SIZE, 0), (0, -CHAMFER4_SIZE), (0, 0), align=None)
    chamfer4_piece_17b = extrude(amount=27.644531716, mode=Mode.PRIVATE)
    chamfer4_piece_17b = split(chamfer4_piece_17b, bisect_by=Plane(origin=(170, -14.5, 52.773817919), z_dir=(-1, 0, 0)), keep=Keep.TOP, mode=Mode.PRIVATE)
    chamfer4_piece_17b = split(chamfer4_piece_17b, bisect_by=Plane(origin=(182.273817919, -14.5, 45.5), z_dir=(0, 0, -1)), keep=Keep.TOP, mode=Mode.PRIVATE)
    chamfer4_piece_17 = chamfer4_piece_17a & chamfer4_piece_17b
    add(chamfer4_piece_17)
    with BuildSketch(Plane(origin=(190, -14.5, -14.5), x_dir=(1, 0, 0), z_dir=(0, 0, -1))) as chamfer4_piece_18a_section:
        Polygon((CHAMFER4_SIZE, 0), (0, -CHAMFER4_SIZE), (0, 0), align=None)
    chamfer4_piece_18a = extrude(amount=20.286731952, mode=Mode.PRIVATE)
    chamfer4_piece_18a = split(chamfer4_piece_18a, bisect_by=Plane(origin=(195, -14.5, -19.5), z_dir=(0.7071067811865476, 0, -0.7071067811865476)), keep=Keep.TOP, mode=Mode.PRIVATE)
    chamfer4_piece_18a = split(chamfer4_piece_18a, bisect_by=Plane(origin=(190, -14.5, -29.5), z_dir=(0, 0, 1)), keep=Keep.TOP, mode=Mode.PRIVATE)
    with BuildSketch(Plane(origin=(177.726182081, -14.5, -36.773817919), x_dir=(0.7071067811865476, 0, -0.7071067811865476), z_dir=(0.7071067811865476, 0, 0.7071067811865476))) as chamfer4_piece_18b_section:
        Polygon((CHAMFER4_SIZE, 0), (0, CHAMFER4_SIZE), (0, 0), align=None)
    chamfer4_piece_18b = extrude(amount=27.644531716, mode=Mode.PRIVATE)
    chamfer4_piece_18b = split(chamfer4_piece_18b, bisect_by=Plane(origin=(190, -14.5, -36.773817919), z_dir=(1, 0, 0)), keep=Keep.TOP, mode=Mode.PRIVATE)
    chamfer4_piece_18b = split(chamfer4_piece_18b, bisect_by=Plane(origin=(177.726182081, -14.5, -29.5), z_dir=(0, 0, 1)), keep=Keep.TOP, mode=Mode.PRIVATE)
    chamfer4_piece_18 = chamfer4_piece_18a & chamfer4_piece_18b
    add(chamfer4_piece_18)


solid = part.part
